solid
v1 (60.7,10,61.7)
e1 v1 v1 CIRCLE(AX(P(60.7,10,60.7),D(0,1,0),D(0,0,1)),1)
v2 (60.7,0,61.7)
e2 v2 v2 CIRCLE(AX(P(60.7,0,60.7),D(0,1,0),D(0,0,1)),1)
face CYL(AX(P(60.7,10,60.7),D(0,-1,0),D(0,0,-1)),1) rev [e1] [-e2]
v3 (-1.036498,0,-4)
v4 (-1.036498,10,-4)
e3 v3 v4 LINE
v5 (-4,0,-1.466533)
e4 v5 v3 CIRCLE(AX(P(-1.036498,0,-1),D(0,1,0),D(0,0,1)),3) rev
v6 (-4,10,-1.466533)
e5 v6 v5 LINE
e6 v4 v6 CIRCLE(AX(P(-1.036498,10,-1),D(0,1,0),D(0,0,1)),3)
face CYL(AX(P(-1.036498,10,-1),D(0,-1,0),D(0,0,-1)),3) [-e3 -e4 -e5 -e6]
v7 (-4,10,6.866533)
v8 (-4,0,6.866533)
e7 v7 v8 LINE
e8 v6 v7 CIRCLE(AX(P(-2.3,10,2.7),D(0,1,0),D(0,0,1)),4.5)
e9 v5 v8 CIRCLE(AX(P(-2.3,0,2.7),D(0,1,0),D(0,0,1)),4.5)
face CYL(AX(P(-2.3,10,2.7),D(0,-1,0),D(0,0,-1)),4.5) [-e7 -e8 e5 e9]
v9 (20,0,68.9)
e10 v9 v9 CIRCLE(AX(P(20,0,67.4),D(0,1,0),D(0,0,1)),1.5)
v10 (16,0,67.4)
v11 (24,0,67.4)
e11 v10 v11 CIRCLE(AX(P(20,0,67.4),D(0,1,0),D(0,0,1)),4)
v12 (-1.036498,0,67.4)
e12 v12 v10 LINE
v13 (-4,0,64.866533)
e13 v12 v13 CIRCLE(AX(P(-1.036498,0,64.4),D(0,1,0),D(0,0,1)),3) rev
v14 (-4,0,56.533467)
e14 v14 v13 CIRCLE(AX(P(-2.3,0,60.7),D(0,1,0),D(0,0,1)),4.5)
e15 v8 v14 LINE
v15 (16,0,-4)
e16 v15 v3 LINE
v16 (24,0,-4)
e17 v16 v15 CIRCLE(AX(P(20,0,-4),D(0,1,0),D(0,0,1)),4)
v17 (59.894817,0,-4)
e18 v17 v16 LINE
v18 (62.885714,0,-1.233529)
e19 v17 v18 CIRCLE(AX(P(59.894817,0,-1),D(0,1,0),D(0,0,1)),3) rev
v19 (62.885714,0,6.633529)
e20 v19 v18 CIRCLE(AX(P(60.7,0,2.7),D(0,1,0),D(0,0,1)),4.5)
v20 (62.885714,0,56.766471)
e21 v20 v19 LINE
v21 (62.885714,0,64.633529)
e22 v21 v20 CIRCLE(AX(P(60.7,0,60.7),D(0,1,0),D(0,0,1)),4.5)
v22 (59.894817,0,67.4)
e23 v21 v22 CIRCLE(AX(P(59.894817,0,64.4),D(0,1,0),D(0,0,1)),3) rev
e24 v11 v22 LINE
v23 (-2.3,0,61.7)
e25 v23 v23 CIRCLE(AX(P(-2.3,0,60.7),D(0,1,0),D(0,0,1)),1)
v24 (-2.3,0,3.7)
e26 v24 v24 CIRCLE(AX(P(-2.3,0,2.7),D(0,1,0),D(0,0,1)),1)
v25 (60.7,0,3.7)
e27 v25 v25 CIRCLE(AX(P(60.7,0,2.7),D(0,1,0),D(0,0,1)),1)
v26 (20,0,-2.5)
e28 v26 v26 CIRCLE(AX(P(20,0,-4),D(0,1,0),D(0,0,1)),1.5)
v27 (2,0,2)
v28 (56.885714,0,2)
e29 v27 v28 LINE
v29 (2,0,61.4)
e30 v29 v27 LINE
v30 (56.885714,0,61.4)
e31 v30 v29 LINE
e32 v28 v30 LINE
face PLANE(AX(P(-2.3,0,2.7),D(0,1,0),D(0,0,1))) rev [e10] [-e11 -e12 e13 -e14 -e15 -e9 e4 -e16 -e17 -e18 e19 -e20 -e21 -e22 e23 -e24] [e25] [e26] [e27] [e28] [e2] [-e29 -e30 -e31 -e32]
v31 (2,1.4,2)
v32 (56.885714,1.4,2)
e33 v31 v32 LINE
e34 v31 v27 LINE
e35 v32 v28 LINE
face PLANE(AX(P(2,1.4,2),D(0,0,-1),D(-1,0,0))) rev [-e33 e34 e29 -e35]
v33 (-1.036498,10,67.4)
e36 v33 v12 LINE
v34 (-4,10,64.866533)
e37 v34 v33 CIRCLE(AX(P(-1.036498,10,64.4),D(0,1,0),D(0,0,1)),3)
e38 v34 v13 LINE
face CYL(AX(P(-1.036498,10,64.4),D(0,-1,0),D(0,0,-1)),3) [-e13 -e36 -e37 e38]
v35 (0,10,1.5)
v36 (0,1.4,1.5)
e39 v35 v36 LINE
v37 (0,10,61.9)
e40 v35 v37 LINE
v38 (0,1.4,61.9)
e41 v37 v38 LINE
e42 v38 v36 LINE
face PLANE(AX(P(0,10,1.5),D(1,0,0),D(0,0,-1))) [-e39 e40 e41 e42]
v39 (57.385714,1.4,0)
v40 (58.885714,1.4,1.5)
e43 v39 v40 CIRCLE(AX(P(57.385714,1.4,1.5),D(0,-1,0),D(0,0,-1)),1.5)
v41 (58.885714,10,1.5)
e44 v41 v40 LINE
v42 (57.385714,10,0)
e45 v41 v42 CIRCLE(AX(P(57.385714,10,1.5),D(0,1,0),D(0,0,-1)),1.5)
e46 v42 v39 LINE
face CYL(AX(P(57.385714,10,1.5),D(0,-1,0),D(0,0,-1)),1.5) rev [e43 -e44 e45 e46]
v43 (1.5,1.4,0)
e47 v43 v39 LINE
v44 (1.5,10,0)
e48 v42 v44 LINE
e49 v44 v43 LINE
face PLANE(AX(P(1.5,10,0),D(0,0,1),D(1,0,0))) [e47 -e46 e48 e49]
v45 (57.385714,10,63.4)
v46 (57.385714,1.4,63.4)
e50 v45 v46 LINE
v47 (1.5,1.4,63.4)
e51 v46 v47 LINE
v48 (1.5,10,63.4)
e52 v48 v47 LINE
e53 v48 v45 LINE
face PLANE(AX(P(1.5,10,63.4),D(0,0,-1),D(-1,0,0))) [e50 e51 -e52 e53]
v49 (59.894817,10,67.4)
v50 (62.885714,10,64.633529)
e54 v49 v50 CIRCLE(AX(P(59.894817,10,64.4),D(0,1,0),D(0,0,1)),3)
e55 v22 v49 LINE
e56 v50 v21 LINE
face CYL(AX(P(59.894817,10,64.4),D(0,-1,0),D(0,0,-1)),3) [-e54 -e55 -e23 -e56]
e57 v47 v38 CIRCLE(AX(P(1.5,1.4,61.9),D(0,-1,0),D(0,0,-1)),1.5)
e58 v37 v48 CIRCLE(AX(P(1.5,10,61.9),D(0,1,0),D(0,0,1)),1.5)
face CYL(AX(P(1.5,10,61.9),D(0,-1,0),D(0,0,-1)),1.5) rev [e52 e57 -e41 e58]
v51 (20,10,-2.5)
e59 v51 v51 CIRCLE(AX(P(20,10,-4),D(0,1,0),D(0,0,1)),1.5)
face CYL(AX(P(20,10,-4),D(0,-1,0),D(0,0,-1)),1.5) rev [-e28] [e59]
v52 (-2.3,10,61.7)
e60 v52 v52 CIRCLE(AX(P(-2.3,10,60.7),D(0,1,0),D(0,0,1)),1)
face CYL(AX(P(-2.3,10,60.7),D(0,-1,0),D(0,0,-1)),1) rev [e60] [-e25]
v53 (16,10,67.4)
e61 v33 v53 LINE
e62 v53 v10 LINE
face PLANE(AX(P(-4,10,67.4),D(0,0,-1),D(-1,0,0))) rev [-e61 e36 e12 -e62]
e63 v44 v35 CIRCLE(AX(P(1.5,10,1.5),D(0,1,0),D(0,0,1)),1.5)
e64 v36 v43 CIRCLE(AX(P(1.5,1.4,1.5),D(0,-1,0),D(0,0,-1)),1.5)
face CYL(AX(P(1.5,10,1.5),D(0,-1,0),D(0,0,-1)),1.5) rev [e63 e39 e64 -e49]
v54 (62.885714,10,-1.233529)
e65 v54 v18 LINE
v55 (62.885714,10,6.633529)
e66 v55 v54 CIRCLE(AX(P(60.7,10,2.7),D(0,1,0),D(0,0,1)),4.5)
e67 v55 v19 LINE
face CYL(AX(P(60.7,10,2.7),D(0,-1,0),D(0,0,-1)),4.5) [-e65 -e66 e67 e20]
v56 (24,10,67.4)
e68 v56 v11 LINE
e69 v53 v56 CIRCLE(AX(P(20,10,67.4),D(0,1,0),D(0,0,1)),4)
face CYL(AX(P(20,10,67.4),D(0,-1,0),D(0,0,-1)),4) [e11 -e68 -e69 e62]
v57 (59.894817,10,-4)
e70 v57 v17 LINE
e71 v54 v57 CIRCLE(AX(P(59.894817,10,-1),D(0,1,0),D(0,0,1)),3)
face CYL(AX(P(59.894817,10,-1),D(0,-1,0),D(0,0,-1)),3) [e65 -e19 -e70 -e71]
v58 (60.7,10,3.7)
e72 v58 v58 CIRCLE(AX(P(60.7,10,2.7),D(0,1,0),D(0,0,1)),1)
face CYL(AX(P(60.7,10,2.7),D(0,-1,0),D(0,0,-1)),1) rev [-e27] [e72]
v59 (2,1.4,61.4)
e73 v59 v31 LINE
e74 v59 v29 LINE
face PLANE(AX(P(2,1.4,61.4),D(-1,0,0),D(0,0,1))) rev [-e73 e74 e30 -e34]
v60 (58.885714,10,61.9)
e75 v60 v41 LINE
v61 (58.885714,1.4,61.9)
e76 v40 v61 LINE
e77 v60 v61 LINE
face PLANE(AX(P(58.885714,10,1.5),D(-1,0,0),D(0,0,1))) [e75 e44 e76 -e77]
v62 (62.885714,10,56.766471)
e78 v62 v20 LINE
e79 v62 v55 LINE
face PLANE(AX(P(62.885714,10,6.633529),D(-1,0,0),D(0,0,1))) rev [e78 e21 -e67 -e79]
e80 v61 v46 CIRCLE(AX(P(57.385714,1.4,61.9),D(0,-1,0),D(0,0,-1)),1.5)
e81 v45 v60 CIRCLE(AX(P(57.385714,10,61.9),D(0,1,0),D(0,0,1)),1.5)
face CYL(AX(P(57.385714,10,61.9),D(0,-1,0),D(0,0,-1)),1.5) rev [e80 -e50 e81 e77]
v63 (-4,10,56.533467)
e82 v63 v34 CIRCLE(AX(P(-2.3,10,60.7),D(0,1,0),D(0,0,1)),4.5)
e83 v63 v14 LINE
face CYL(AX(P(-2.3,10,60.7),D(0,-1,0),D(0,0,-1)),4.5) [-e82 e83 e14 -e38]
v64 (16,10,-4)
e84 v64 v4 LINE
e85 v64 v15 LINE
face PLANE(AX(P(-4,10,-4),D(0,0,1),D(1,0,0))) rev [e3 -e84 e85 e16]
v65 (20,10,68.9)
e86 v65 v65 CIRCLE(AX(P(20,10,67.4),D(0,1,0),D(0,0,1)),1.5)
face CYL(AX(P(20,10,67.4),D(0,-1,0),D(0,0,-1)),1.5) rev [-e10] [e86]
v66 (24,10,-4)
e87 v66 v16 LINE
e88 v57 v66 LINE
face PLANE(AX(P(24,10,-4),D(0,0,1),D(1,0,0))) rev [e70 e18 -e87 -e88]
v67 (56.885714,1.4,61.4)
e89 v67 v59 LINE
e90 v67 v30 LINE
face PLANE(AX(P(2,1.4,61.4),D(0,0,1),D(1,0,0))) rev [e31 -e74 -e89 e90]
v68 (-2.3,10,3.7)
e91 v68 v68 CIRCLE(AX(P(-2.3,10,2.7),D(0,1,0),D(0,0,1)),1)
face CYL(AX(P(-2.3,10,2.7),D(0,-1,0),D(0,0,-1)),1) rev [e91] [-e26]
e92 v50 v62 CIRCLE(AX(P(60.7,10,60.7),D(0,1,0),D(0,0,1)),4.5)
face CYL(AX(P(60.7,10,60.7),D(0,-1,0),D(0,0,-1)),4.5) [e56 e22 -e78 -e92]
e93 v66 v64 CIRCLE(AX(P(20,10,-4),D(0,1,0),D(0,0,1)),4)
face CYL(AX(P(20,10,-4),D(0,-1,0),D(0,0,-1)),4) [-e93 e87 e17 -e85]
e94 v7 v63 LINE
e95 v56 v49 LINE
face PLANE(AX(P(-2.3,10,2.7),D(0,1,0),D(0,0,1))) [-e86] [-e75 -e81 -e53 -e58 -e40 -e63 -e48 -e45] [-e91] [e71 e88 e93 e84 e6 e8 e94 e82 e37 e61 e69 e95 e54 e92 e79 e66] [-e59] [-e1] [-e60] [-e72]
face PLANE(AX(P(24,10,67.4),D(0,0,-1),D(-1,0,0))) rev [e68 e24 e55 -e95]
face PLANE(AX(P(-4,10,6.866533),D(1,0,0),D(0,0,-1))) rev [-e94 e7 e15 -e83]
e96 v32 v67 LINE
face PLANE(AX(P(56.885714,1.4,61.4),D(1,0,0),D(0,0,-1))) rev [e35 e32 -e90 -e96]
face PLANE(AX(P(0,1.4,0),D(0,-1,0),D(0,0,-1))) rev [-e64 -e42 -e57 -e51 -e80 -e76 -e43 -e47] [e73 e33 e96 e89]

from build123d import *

# Parameters (mm, degrees)
SKETCH_1_R      = 1
SKETCH_1_R_2    = 1.5
EXTRUDE_1_DEPTH = 10
SKETCH_3_W      = 58.885714286
SKETCH_3_H      = 63.4
SKETCH_3_W_2    = 54.885714286
SKETCH_3_H_2    = 59.4
EXTRUDE_2_DEPTH = 1.4
FILLET_1_R      = 3


with BuildPart() as part:
    # Эскиз1 → Бобышка-Вытянуть1 (new body)
    with BuildSketch(Plane(origin=(0, 0, 0), x_dir=(1, 0, 0), z_dir=(0, 1, 0))):
        with BuildLine():
            Line((-4, 4), (16, 4))
            ThreePointArc((16, 4), (20, 8), (24, 4))
            Line((24, 4), (62.885714286, 4))
            Line((62.885714286, 4), (62.885714286, 1.233529339))
            ThreePointArc((62.885714286, 1.233529339), (65.2, -2.7), (62.885714286, -6.633529339))
            Line((62.885714286, -6.633529339), (62.885714286, -56.766470661))
            ThreePointArc((62.885714286, -56.766470661), (65.2, -60.7), (62.885714286, -64.633529339))
            Line((62.885714286, -64.633529339), (62.885714286, -67.4))
            Line((62.885714286, -67.4), (24, -67.4))
            ThreePointArc((24, -67.4), (20, -71.4), (16, -67.4))
            Line((16, -67.4), (-4, -67.4))
            Line((-4, -67.4), (-4, -64.866533331))
            ThreePointArc((-4, -64.866533331), (-6.8, -60.7), (-4, -56.533466669))
            Line((-4, -56.533466669), (-4, -6.866533331))
            ThreePointArc((-4, -6.866533331), (-6.8, -2.7), (-4, 1.466533331))
            Line((-4, 1.466533331), (-4, 4))
        make_face()
        with Locations(Location((-2.3, -2.7, 0), (0, 0, 270))):
            Circle(SKETCH_1_R, mode=Mode.SUBTRACT)
        with Locations(Location((60.7, -2.7, 0), (0, 0, 270))):
            Circle(SKETCH_1_R, mode=Mode.SUBTRACT)
        with Locations(Location((60.7, -60.7, 0), (0, 0, 270))):
            Circle(SKETCH_1_R, mode=Mode.SUBTRACT)
        with Locations(Location((-2.3, -60.7, 0), (0, 0, 270))):
            Circle(SKETCH_1_R, mode=Mode.SUBTRACT)
        with Locations(Location((20, -67.4, 0), (0, 0, 270))):
            Circle(SKETCH_1_R_2, mode=Mode.SUBTRACT)
        with Locations(Location((20, 4, 0), (0, 0, 270))):
            Circle(SKETCH_1_R_2, mode=Mode.SUBTRACT)
        with BuildLine():
            Line((1.5, 0), (57.385714286, 0))
            ThreePointArc((57.385714286, 0), (58.446374457, -0.439339828), (58.885714286, -1.5))
            Line((58.885714286, -1.5), (58.885714286, -61.9))
            ThreePointArc((58.885714286, -61.9), (58.446374457, -62.960660172), (57.385714286, -63.4))
            Line((57.385714286, -63.4), (1.5, -63.4))
            ThreePointArc((1.5, -63.4), (0.439339828, -62.960660172), (0, -61.9))
            Line((0, -61.9), (0, -1.5))
            ThreePointArc((0, -1.5), (0.439339828, -0.439339828), (1.5, 0))
        make_face(mode=Mode.SUBTRACT)
    extrude(amount=EXTRUDE_1_DEPTH)

    # Эскиз3 → Бобышка-Вытянуть2 (add)
    with BuildSketch(Plane.XZ):
        with Locations((29.442857143, 31.7)):
            Rectangle(SKETCH_3_W, SKETCH_3_H)
        with Locations((29.442857143, 31.7)):
            Rectangle(SKETCH_3_W_2, SKETCH_3_H_2, mode=Mode.SUBTRACT)
    extrude(amount=-EXTRUDE_2_DEPTH)

    # Скругление1
    # the kernel refuses this fillet: 3 mm, written as the material it takes off along each edge
    with BuildSketch(Plane(origin=(62.885714286, -7.477242159, 67.4), x_dir=(-1, 0, 0), z_dir=(0, 1, 0))) as fillet_1_piece_1:
        with BuildLine():
            CenterArc((2.990896863, -3), FILLET_1_R, 90, 85.535401485)
            Line((0, -2.766470661), (-0.059817937, -2.761800074))
            ThreePointArc((-0.059817937, -2.761800074), (-0.06, -1.38323533), (-0.06, 0))
            Line((-0.06, 0), (0, 0.06))
            Line((0, 0.06), (2.990896863, 0.06))
            Line((2.990896863, 0.06), (2.990896863, 0))
        make_face()
    extrude(amount=24.954484317, mode=Mode.SUBTRACT)
    with BuildSketch(Plane(origin=(-4, -7.408756074, 67.4), x_dir=(0, 0, -1), z_dir=(0, 1, 0))) as fillet_1_piece_2:
        with BuildLine():
            CenterArc((3, -2.96350243), FILLET_1_R, 98.946440174, 81.053559826)
            Line((0, -2.96350243), (-0.06, -2.96350243))
            Line((-0.06, -2.96350243), (-0.06, 0))
            Line((-0.06, 0), (0, 0.06))
            ThreePointArc((0, 0.06), (1.266733334, 0.06), (2.524136002, 0.059270049))
            Line((2.524136002, 0.059270049), (2.533466669, 0))
        make_face()
    extrude(amount=24.817512149, mode=Mode.SUBTRACT)
    with BuildSketch(Plane(origin=(62.885714286, -7.477242159, -4), x_dir=(-1, 0, 0), z_dir=(0, 1, 0))) as fillet_1_piece_3:
        with BuildLine():
            CenterArc((2.990896863, 3), FILLET_1_R, 184.464598515, 85.535401485)
            Line((0, 2.766470661), (-0.059817937, 2.761800074))
            ThreePointArc((-0.059817937, 2.761800074), (-0.06, 1.38323533), (-0.06, 0))
            Line((-0.06, 0), (0, -0.06))
            Line((0, -0.06), (2.990896863, -0.06))
            Line((2.990896863, -0.06), (2.990896863, 0))
        make_face()
    extrude(amount=24.954484317, mode=Mode.SUBTRACT)
    with BuildSketch(Plane(origin=(-4, -7.408756074, -4), x_dir=(0, 0, 1), z_dir=(0, 1, 0))) as fillet_1_piece_4:
        with BuildLine():
            CenterArc((3, 2.96350243), FILLET_1_R, 180, 81.053559826)
            Line((0, 2.96350243), (-0.06, 2.96350243))
            Line((-0.06, 2.96350243), (-0.06, 0))
            Line((-0.06, 0), (0, -0.06))
            ThreePointArc((0, -0.06), (1.266733334, -0.06), (2.524136002, -0.059270049))
            Line((2.524136002, -0.059270049), (2.533466669, 0))
        make_face()
    extrude(amount=24.817512149, mode=Mode.SUBTRACT)


solid = part.part
